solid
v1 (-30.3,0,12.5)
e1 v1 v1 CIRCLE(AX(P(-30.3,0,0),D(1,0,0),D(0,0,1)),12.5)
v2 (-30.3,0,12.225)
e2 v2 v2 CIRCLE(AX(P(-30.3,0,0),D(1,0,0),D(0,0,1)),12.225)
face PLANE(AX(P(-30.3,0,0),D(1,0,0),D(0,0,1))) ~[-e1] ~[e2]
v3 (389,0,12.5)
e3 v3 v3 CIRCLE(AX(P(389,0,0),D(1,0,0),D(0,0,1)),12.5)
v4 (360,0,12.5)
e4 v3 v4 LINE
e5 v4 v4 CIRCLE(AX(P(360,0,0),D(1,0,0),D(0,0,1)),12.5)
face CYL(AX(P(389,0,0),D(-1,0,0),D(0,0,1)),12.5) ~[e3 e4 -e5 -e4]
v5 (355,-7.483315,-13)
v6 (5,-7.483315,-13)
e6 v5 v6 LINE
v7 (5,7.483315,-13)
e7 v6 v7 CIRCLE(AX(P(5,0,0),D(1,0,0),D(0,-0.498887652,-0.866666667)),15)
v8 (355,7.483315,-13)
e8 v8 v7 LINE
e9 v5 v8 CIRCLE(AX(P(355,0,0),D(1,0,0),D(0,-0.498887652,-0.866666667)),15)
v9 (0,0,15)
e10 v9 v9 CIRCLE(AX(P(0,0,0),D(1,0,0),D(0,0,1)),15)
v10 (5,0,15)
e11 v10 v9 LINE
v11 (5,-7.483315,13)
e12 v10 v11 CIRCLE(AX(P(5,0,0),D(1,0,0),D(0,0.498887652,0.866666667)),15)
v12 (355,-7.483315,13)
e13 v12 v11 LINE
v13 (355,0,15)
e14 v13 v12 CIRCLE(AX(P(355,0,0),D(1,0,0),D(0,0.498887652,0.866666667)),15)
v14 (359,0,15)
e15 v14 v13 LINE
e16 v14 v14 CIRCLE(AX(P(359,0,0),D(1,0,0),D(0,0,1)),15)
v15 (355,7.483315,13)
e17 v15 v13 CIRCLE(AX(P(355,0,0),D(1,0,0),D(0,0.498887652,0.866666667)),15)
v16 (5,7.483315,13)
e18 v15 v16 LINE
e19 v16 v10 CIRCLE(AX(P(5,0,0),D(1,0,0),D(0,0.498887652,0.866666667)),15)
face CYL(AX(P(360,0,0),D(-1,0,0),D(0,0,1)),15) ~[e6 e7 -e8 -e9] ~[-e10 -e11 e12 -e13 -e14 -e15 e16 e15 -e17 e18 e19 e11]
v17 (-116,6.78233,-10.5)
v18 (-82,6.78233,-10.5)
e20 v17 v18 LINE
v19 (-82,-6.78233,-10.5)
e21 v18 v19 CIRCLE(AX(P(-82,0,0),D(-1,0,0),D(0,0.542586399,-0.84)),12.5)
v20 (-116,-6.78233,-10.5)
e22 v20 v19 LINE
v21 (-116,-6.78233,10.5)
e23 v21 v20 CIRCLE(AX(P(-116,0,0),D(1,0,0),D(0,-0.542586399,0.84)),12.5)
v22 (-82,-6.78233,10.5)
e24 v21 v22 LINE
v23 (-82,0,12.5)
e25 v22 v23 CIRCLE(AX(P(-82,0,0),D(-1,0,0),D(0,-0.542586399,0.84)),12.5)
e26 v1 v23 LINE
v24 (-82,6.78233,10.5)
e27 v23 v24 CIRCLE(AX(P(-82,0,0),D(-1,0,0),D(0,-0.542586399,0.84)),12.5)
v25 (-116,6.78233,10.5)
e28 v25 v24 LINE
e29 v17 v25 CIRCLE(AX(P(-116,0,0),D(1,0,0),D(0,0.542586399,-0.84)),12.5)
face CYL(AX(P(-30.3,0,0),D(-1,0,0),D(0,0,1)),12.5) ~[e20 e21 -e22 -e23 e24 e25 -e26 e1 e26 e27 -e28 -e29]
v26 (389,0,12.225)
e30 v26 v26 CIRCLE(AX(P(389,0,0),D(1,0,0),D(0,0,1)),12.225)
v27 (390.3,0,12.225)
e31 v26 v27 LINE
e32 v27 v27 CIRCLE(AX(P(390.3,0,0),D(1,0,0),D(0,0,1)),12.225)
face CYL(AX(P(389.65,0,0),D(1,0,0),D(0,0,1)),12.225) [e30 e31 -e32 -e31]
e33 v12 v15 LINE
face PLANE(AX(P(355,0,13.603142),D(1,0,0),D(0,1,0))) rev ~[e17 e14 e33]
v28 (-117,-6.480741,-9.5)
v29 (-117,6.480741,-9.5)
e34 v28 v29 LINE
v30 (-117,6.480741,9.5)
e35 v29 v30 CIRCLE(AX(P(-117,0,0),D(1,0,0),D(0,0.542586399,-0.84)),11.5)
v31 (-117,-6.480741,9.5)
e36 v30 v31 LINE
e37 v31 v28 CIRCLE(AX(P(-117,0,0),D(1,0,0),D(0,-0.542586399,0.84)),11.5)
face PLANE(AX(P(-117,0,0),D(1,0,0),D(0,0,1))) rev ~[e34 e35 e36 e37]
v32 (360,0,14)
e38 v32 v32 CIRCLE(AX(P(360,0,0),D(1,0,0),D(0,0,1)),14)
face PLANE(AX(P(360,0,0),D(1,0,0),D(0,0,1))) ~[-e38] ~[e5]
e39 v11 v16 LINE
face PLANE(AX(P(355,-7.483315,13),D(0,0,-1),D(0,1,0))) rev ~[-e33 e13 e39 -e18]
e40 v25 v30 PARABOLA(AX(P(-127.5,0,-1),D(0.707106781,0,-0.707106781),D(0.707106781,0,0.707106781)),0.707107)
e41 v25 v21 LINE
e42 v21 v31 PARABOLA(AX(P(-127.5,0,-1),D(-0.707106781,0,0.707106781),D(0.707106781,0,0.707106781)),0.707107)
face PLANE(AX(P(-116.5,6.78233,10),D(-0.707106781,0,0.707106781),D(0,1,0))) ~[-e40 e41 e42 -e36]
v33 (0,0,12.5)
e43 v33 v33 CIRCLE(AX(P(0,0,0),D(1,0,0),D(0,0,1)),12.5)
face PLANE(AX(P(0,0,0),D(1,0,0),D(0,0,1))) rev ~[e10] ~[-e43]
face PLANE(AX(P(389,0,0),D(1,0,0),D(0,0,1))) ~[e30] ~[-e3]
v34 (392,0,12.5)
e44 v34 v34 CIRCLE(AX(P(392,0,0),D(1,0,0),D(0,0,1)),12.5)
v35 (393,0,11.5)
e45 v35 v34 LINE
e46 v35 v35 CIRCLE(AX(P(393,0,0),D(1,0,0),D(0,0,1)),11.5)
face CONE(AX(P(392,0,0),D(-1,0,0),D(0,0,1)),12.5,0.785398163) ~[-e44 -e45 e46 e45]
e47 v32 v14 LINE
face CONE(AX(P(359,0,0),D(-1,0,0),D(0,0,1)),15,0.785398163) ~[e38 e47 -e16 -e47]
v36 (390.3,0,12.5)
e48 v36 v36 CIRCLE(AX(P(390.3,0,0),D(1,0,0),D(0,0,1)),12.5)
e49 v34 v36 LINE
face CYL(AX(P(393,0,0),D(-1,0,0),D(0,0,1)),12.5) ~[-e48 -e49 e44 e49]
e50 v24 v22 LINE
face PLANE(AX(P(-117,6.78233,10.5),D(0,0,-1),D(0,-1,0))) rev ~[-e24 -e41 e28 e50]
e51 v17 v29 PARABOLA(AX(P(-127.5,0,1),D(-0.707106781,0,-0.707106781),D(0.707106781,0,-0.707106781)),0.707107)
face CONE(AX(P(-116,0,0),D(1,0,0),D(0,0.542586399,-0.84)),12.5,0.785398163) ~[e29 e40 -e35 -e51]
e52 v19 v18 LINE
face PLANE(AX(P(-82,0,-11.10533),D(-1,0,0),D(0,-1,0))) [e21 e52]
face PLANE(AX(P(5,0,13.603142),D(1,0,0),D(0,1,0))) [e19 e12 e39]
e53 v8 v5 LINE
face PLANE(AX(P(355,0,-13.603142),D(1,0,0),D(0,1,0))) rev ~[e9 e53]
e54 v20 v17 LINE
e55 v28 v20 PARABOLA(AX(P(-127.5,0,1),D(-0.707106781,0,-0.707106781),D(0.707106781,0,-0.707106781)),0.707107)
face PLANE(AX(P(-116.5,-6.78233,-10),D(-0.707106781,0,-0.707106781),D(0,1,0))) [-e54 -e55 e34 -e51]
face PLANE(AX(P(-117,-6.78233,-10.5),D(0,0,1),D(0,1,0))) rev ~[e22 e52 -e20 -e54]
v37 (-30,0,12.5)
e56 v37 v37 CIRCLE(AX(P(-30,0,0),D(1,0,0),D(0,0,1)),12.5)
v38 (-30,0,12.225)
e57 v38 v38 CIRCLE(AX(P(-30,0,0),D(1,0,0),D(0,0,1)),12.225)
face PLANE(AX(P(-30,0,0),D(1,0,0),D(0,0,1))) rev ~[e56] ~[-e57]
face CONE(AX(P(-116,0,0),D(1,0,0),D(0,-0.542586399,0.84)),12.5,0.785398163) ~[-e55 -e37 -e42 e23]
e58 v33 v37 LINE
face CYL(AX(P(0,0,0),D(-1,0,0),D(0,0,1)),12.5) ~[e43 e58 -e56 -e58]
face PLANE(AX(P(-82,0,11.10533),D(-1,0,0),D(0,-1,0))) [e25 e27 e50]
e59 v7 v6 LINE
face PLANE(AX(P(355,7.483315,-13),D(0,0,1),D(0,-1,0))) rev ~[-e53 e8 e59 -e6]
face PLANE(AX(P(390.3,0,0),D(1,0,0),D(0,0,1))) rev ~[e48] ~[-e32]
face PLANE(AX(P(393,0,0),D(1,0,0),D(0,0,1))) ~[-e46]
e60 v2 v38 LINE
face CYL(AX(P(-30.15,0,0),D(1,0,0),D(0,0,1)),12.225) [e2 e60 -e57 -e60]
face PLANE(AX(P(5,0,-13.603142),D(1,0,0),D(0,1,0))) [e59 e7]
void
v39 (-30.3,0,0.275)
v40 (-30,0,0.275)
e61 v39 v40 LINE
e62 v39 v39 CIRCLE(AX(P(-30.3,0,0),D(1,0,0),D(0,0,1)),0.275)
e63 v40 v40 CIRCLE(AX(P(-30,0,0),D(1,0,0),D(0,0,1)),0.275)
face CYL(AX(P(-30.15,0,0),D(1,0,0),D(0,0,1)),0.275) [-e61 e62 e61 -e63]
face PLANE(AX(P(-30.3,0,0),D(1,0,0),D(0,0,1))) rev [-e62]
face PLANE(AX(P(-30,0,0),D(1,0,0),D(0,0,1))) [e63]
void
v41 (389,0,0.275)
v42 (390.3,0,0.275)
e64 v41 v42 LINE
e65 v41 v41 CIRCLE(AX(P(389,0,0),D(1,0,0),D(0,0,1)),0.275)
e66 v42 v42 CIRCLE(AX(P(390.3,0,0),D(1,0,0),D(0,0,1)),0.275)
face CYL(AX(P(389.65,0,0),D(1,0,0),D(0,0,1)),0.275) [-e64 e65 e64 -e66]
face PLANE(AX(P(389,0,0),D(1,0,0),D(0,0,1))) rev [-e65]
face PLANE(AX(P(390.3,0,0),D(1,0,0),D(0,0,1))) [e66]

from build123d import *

# Parameters (mm, degrees)
F0_W     = 0.3
F0_H     = 11.95
F0_W_2   = 1.3
F4_DEPTH = 350
F6_DEPTH = 35
F7_SIZE2 = 1
F7_SIZE  = 1


with BuildPart() as f1:
    # F0 (on Front) → F1 (revolve)
    with BuildSketch(Plane.XZ):
        Polygon((-30, 0), (0, 0), (0, 12.5), (-30, 12.5), (-30, 12.225), (-30, 0.275), align=None)
        Polygon((0, 12.5), (0, 0), (360, 0), (360, 12.5), (360, 15), (0, 15), align=None)
        Polygon((360, 12.5), (360, 0), (389, 0), (389, 0.275), (389, 12.225), (389, 12.5), align=None)
        with Locations((-30.15, 6.25)):
            Rectangle(F0_W, F0_H)
        Polygon((-30.3, 0), (-30.3, 0.275), (-30.3, 12.225), (-30.3, 12.5), (-117, 12.5), (-117, 0), align=None)
        with Locations((389.65, 6.25)):
            Rectangle(F0_W_2, F0_H)
        Polygon((390.3, 12.225), (390.3, 0.275), (390.3, 0), (393, 0), (393, 12.5), (390.3, 12.5), align=None)
    revolve(axis=Axis((165, 0, 0), (1, 0, 0)))

    # F3 (on offset) → F4 (cut)
    with BuildSketch(Plane.YZ.offset(355)):
        with BuildLine():
            ThreePointArc((7.4833147735, 13), (0, 15), (-7.4833147735, 13))
            Line((-7.4833147735, 13), (7.4833147735, 13))
        make_face()
        with BuildLine():
            Line((7.4833147735, -13), (-7.4833147735, -13))
            ThreePointArc((-7.4833147735, -13), (0, -15), (7.4833147735, -13))
        make_face()
    extrude(amount=-F4_DEPTH, mode=Mode.SUBTRACT)

    # F5 (on face) → F6 (cut)
    with BuildSketch(Plane(origin=(-117, 0, 0), x_dir=(0, -1, 0), z_dir=(-1, 0, 0))):
        with BuildLine():
            ThreePointArc((6.7823299831, 10.5), (0, 12.5), (-6.7823299831, 10.5))
            Line((-6.7823299831, 10.5), (6.7823299831, 10.5))
        make_face()
        with BuildLine():
            Line((6.7823299831, -10.5), (-6.7823299831, -10.5))
            ThreePointArc((-6.7823299831, -10.5), (0, -12.5), (6.7823299831, -10.5))
        make_face()
    extrude(amount=-F6_DEPTH, mode=Mode.SUBTRACT)

    # F7
    f7_edges = [f1.edges().sort_by_distance(p)[0] for p in [
        (-117, 0, 10.5),
        (-117, 12.5, 0),
        (-117, 0, -10.5),
        (-117, -12.5, 0),
        (393, 0, -12.5),
        (360, 0, -15),
    ]]
    chamfer(f7_edges, length=F7_SIZE, length2=F7_SIZE2)


solid = f1.part
